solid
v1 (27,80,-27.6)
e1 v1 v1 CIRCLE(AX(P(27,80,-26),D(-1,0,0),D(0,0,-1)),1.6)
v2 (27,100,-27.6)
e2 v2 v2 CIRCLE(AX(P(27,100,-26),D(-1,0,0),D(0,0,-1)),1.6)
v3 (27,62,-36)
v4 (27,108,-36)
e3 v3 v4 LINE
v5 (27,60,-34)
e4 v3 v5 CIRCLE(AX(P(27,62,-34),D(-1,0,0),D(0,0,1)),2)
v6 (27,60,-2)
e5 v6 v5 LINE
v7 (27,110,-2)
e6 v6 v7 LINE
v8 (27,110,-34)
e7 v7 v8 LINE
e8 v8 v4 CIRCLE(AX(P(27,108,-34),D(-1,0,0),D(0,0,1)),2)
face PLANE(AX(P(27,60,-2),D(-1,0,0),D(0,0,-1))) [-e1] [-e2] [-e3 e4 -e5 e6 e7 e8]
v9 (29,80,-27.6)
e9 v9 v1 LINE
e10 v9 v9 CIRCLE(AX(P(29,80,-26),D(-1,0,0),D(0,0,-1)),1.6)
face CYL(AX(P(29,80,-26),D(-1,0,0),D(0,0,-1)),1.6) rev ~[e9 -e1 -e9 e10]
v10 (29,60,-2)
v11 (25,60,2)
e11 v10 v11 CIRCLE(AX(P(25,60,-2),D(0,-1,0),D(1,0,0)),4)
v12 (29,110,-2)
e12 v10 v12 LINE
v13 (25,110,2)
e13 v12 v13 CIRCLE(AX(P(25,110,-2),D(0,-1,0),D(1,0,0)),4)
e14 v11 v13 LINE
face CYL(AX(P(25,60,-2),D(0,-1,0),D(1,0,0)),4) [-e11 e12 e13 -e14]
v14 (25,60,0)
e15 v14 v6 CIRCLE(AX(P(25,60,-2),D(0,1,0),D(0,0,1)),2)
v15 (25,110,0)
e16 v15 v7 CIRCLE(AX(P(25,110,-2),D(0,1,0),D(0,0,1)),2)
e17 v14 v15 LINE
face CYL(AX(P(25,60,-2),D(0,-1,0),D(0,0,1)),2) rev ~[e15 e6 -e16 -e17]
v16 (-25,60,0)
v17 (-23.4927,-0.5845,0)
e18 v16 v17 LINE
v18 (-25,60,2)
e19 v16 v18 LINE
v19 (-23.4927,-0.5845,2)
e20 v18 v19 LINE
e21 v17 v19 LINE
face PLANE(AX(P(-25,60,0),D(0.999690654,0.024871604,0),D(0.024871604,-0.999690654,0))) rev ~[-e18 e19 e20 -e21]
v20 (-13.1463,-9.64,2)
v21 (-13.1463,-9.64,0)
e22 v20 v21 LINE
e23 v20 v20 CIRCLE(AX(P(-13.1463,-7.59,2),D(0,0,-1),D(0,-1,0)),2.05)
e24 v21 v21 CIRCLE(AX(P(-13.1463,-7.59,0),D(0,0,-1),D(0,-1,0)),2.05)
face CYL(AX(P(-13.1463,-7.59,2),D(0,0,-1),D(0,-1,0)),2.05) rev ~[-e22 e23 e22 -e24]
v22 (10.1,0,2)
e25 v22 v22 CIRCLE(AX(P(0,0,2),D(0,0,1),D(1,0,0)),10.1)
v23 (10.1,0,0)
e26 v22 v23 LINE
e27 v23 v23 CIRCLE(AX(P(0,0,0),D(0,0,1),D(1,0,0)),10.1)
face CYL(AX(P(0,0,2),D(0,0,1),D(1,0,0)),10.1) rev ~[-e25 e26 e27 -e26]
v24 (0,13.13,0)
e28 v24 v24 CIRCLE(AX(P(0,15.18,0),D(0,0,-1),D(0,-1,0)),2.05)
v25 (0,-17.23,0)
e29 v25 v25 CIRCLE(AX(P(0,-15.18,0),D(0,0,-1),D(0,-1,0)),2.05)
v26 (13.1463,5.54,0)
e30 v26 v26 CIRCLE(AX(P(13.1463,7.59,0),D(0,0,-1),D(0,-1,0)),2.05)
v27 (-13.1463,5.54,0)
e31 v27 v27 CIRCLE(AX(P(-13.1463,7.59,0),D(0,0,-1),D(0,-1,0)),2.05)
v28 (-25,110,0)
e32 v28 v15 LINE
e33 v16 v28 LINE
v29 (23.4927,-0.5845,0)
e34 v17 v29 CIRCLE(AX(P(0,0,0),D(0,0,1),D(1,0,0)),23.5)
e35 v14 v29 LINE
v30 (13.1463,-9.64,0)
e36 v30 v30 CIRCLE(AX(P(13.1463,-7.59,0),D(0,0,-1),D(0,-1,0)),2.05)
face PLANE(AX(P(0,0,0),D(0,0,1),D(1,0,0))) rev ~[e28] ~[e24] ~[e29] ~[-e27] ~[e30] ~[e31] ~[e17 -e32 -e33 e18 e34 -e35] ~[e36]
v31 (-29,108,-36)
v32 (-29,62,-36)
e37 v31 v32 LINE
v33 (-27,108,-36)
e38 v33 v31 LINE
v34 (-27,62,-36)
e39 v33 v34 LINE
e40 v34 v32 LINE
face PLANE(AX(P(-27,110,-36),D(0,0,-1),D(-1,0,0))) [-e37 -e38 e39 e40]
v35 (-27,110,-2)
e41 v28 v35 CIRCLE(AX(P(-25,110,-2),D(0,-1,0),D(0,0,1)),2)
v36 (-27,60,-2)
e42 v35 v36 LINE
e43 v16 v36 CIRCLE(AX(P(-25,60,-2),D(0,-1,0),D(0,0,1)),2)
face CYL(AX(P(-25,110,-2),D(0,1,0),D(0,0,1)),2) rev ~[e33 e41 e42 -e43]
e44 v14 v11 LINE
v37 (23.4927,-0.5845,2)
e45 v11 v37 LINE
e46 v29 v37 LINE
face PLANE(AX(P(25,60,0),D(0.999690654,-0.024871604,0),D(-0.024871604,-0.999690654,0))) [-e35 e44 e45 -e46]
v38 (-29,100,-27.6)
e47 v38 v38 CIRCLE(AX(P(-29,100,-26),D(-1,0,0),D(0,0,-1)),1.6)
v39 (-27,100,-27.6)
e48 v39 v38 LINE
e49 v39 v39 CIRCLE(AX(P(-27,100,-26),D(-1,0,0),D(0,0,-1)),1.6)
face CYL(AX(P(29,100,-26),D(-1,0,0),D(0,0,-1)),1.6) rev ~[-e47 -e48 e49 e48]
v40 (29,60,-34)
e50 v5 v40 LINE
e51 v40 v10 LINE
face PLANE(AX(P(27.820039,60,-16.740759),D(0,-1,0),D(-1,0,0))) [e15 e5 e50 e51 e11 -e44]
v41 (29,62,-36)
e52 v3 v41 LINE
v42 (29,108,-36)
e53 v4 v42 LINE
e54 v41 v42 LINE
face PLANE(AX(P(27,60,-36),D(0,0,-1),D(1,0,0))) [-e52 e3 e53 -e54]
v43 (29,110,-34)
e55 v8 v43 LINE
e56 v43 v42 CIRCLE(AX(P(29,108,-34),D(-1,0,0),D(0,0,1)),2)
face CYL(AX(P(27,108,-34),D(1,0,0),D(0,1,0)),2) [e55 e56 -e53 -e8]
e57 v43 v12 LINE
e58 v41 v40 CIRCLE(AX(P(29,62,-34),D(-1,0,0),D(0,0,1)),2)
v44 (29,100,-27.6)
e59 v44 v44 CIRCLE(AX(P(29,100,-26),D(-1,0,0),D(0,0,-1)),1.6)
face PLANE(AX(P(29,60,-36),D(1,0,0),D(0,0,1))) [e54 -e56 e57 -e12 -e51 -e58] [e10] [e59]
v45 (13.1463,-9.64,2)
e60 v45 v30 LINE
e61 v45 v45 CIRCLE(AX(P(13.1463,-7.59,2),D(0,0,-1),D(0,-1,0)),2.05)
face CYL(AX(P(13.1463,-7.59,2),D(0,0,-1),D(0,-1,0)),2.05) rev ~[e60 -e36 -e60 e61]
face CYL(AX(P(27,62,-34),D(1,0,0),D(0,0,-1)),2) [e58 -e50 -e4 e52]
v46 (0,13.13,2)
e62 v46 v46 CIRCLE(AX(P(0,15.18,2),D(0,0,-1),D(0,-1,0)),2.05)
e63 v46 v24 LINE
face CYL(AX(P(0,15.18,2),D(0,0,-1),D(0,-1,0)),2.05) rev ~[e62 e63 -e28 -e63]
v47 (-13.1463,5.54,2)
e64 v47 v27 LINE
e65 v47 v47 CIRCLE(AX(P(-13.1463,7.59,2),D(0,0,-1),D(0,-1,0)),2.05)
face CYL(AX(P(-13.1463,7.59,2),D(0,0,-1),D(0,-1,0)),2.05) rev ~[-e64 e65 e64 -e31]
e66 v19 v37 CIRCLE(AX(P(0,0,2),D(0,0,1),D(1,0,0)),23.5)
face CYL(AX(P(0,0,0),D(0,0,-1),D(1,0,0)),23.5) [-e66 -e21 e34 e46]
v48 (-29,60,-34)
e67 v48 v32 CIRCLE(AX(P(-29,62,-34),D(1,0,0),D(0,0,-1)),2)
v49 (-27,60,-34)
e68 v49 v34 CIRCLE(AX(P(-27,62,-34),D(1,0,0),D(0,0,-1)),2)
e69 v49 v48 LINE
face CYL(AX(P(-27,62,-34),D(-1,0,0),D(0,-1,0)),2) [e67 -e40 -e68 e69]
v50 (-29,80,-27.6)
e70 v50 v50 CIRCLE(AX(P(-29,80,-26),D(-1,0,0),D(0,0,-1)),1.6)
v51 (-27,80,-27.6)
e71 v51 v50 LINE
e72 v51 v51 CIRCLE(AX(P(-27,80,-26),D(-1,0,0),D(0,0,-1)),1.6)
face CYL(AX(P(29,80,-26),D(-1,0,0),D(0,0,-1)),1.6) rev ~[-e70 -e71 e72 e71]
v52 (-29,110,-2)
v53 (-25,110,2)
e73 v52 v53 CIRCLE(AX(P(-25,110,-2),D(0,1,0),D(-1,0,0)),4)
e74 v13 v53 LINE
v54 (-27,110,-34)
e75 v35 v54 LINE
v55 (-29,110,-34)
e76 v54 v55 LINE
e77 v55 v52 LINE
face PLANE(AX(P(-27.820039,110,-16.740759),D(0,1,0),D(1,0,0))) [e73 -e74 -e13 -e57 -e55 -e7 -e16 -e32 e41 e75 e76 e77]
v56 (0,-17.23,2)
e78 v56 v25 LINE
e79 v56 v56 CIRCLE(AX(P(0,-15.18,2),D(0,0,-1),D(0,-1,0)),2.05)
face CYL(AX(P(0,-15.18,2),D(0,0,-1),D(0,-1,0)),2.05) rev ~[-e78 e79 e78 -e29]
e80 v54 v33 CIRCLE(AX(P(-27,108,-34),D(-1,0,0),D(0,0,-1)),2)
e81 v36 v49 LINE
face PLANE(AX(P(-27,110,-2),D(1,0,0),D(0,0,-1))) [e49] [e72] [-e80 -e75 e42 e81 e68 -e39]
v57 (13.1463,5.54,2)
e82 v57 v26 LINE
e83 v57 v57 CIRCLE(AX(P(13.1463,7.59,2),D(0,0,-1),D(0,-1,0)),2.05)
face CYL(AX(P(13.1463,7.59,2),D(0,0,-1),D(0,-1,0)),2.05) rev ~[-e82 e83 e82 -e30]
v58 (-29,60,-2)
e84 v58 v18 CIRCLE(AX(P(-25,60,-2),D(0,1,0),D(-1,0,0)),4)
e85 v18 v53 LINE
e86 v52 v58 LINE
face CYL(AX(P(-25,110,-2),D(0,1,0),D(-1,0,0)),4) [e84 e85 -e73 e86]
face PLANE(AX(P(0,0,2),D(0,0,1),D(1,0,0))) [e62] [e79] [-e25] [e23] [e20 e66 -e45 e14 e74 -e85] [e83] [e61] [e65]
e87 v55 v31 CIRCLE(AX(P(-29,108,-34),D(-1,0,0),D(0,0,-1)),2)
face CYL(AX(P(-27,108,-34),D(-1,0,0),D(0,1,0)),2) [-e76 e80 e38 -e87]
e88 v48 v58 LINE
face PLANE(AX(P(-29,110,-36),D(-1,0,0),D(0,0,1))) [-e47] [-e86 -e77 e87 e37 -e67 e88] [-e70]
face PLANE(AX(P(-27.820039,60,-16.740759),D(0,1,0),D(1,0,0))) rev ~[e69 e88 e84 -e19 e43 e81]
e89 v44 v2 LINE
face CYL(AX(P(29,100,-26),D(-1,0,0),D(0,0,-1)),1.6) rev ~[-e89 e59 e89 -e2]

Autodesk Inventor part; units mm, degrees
ref_plane "YZ Plane" through (0, 0, 0) normal (1, 0, 0) x (0, 1, 0)
ref_plane "XZ Plane" through (0, 0, 0) normal (0, 1, 0) x (-1, 0, 0)
ref_plane "XY Plane" through (0, 0, 0) normal (0, 0, 1) x (1, 0, 0)
sketch "スケッチ1" plane through (0, 0, 0) normal (0, 0, 1) x (1, 0, 0)
  circle A0 centre (0, 0) radius 23.5
  line L0 (0, 0) -> (0, 60)
  line L1 (0, 60) -> (25, 60)
  line L2 (25, 60) -> (25, 110)
  line L3 (25, 110) -> (0, 110)
  line L4 (0, 110) -> (0, 60)
  line L5 (25, 60) -> (23.4927, -0.5845)
  line L6 (0, 60) -> (-25, 60)
  line L7 (-25, 60) -> (-25, 110)
  line L8 (-25, 110) -> (0, 110)
  line L9 (-25, 60) -> (-23.4927, -0.5845)
  point P0 (-23.4927, -0.5845)
  dimension "d0" = 47
  dimension "d1" = 60
  dimension "d2" = 50
  dimension "d3" = 25
extrude "プレート1" add sketch "スケッチ1" along normal blind 2
sketch "スケッチ2" plane through (27, 60, -2) normal (1, 0, 0) x (0, 1, 0)
  line L0 (50, 0) -> (0, 0)
  line L1 (0, 0) -> (0, -34)
  line L2 (0, -34) -> (50, -34)
  line L3 (50, -34) -> (50, 0)
edge flange "フランジ1" height 38 angle 90 thickness 2 bend radius 2 thickness toward (1, 0, 0) relief tear relief width 2 relief depth 1 edges at (25, 85, 0) wall of the first edge with corners at (27, 110, -2) (27, 60, -2) (27, 60, -36) (27, 110, -36)
bend "曲げ1"
corner "コーナー1"
sketch "スケッチ3" plane through (-27, 110, -2) normal (-1, 0, 0) x (0, -1, 0)
  line L0 (50, 0) -> (0, 0)
  line L1 (0, 0) -> (0, -34)
  line L2 (0, -34) -> (50, -34)
  line L3 (50, -34) -> (50, 0)
edge flange "フランジ2" height 38 angle 90 thickness 2 bend radius 2 thickness toward (-1, 0, 0) relief tear relief width 2 relief depth 1 edges at (-25, 85, 0) wall of the first edge with corners at (-27, 60, -2) (-27, 110, -2) (-27, 110, -36) (-27, 60, -36)
bend "曲げ2"
corner "コーナー2"
sketch "スケッチ4" plane through (0, 0, 2) normal (0, 0, 1) x (1, 0, 0)
  circle A0 centre (0, 0) radius 10.1
  dimension "d25" = 20.2
extrude "押し出し1" cut sketch "スケッチ4" against normal blind 10
sketch "スケッチ5" plane through (0, 0, 2) normal (0, 0, 1) x (1, 0, 0)
  circle A0 centre (0, 0) radius 15.18
  point P0 (0, 15.18)
  point P1 (-13.1463, 7.59)
  point P2 (-13.1463, -7.59)
  point P3 (0, -15.18)
  point P4 (13.1463, -7.59)
  point P5 (13.1463, 7.59)
  dimension "d28" = 30.36
  dimension "d31" = 360
hole "穴1" at (0, 15.18, 2) at (-13.1463, 7.59, 2) at (-13.1463, -7.59, 2) at (0, -15.18, 2) at (13.1463, -7.59, 2) at (13.1463, 7.59, 2) direction (0, 0, -1) diameter 4.1 end through all
sketch "スケッチ6" plane through (29, 60, -36) normal (1, 0, 0) x (0, 0, -1)
  line L0 (0, 0) -> (0, 50) projected
  line L1 (0, 10) -> (-34, 10)
  line L2 (-34, 50) -> (-34, 0) projected
  line L3 (0, 0) -> (-34, 0) projected
  line L4 (0, 50) -> (-34, 50) projected
  line L5 (-10, 50) -> (-10, 10)
  point P0 (-36, -60)
  point P1 (-10, 20)
  point P2 (-10, 40)
  point P3 (-36, 50)
  dimension "d40" = 10
  dimension "d42" = 10
  dimension "d43" = 20
  dimension "d62" = 26
hole "穴2" at (29, 80, -26) at (29, 100, -26) direction (-1, 0, 0) diameter 3.2 end through all
sketch "スケッチ7" plane through (0, 0, 2) normal (0, 0, 1) x (1, 0, 0)
  line L0 (-15, 100) -> (15, 100)
  line L1 (15, 100) -> (15, 60)
  line L2 (15, 60) -> (-15, 60)
  line L3 (-15, 60) -> (-15, 100)
  line L4 (-25, 110) -> (25, 110) projected
  line L5 (-25, 60) -> (-25, 110) projected
  line L6 (25, 110) -> (25, 60) projected
  circle A0 centre (0, 0) radius 10.1 projected
  circle A1 centre (0, 0) radius 13.5
  line L7 (-13.4958, -0.3358) -> (-14.7481, 50)
  line L8 (-23.4927, -0.5845) -> (-25, 60) projected
  line L9 (13.4958, -0.3358) -> (14.7481, 50)
  line L10 (25, 60) -> (23.4927, -0.5845) projected
  line L11 (-14.7481, 50) -> (14.7481, 50)
  line L12 (-14.0018, 20) -> (14.0018, 20)
  dimension "d51" = 10
  dimension "d52" = 10
  dimension "d53" = 10
  dimension "d54" = 40
  dimension "d55" = 10
  dimension "d56" = 10
  dimension "d57" = 20
extrude "押し出し2" [suppressed]
fillet "フィレット1" [suppressed]
fillet "フィレット2" radius 2 4 edges at (-28, 60, -36) (-28, 110, -36) (28, 60, -36) (28, 110, -36)
equation "\"d38\" = Thickness"
equation "\"d4\" = Thickness"
equation "\"d5\" = BendReliefWidth"
equation "\"d6\" = BendReliefDepth"
equation "\"d7\" = MinimumRemnant"
equation "\"d8\" = TransitionRadius"
equation "\"d11\" = BendRadius"
equation "\"d12\" = CornerReliefSize"
equation "\"d13\" = GapSize"
equation "\"d14\" = JacobiRadiusSize"
equation "\"d15\" = BendReliefWidth"
equation "\"d16\" = BendReliefDepth"
equation "\"d17\" = MinimumRemnant"
equation "\"d18\" = TransitionRadius"
equation "\"d21\" = BendRadius"
equation "\"d22\" = CornerReliefSize"
equation "\"d23\" = GapSize"
equation "\"d24\" = JacobiRadiusSize"
equation "\"BendRadius\" = Thickness"
equation "\"BendReliefWidth\" = Thickness"
equation "\"BendReliefDepth\" = 0.5 * Thickness"
equation "\"CornerReliefSize\" = 4 * Thickness"
equation "\"MinimumRemnant\" = 2 * Thickness"
equation "\"TransitionRadius\" = BendRadius"
equation "\"JacobiRadiusSize\" = BendRadius"
equation "\"GapSize\" = Thickness"
equation "\"Thickness\" = 2"
properties part number "servoplate1_forR3" material "アルミニウム 6061"
